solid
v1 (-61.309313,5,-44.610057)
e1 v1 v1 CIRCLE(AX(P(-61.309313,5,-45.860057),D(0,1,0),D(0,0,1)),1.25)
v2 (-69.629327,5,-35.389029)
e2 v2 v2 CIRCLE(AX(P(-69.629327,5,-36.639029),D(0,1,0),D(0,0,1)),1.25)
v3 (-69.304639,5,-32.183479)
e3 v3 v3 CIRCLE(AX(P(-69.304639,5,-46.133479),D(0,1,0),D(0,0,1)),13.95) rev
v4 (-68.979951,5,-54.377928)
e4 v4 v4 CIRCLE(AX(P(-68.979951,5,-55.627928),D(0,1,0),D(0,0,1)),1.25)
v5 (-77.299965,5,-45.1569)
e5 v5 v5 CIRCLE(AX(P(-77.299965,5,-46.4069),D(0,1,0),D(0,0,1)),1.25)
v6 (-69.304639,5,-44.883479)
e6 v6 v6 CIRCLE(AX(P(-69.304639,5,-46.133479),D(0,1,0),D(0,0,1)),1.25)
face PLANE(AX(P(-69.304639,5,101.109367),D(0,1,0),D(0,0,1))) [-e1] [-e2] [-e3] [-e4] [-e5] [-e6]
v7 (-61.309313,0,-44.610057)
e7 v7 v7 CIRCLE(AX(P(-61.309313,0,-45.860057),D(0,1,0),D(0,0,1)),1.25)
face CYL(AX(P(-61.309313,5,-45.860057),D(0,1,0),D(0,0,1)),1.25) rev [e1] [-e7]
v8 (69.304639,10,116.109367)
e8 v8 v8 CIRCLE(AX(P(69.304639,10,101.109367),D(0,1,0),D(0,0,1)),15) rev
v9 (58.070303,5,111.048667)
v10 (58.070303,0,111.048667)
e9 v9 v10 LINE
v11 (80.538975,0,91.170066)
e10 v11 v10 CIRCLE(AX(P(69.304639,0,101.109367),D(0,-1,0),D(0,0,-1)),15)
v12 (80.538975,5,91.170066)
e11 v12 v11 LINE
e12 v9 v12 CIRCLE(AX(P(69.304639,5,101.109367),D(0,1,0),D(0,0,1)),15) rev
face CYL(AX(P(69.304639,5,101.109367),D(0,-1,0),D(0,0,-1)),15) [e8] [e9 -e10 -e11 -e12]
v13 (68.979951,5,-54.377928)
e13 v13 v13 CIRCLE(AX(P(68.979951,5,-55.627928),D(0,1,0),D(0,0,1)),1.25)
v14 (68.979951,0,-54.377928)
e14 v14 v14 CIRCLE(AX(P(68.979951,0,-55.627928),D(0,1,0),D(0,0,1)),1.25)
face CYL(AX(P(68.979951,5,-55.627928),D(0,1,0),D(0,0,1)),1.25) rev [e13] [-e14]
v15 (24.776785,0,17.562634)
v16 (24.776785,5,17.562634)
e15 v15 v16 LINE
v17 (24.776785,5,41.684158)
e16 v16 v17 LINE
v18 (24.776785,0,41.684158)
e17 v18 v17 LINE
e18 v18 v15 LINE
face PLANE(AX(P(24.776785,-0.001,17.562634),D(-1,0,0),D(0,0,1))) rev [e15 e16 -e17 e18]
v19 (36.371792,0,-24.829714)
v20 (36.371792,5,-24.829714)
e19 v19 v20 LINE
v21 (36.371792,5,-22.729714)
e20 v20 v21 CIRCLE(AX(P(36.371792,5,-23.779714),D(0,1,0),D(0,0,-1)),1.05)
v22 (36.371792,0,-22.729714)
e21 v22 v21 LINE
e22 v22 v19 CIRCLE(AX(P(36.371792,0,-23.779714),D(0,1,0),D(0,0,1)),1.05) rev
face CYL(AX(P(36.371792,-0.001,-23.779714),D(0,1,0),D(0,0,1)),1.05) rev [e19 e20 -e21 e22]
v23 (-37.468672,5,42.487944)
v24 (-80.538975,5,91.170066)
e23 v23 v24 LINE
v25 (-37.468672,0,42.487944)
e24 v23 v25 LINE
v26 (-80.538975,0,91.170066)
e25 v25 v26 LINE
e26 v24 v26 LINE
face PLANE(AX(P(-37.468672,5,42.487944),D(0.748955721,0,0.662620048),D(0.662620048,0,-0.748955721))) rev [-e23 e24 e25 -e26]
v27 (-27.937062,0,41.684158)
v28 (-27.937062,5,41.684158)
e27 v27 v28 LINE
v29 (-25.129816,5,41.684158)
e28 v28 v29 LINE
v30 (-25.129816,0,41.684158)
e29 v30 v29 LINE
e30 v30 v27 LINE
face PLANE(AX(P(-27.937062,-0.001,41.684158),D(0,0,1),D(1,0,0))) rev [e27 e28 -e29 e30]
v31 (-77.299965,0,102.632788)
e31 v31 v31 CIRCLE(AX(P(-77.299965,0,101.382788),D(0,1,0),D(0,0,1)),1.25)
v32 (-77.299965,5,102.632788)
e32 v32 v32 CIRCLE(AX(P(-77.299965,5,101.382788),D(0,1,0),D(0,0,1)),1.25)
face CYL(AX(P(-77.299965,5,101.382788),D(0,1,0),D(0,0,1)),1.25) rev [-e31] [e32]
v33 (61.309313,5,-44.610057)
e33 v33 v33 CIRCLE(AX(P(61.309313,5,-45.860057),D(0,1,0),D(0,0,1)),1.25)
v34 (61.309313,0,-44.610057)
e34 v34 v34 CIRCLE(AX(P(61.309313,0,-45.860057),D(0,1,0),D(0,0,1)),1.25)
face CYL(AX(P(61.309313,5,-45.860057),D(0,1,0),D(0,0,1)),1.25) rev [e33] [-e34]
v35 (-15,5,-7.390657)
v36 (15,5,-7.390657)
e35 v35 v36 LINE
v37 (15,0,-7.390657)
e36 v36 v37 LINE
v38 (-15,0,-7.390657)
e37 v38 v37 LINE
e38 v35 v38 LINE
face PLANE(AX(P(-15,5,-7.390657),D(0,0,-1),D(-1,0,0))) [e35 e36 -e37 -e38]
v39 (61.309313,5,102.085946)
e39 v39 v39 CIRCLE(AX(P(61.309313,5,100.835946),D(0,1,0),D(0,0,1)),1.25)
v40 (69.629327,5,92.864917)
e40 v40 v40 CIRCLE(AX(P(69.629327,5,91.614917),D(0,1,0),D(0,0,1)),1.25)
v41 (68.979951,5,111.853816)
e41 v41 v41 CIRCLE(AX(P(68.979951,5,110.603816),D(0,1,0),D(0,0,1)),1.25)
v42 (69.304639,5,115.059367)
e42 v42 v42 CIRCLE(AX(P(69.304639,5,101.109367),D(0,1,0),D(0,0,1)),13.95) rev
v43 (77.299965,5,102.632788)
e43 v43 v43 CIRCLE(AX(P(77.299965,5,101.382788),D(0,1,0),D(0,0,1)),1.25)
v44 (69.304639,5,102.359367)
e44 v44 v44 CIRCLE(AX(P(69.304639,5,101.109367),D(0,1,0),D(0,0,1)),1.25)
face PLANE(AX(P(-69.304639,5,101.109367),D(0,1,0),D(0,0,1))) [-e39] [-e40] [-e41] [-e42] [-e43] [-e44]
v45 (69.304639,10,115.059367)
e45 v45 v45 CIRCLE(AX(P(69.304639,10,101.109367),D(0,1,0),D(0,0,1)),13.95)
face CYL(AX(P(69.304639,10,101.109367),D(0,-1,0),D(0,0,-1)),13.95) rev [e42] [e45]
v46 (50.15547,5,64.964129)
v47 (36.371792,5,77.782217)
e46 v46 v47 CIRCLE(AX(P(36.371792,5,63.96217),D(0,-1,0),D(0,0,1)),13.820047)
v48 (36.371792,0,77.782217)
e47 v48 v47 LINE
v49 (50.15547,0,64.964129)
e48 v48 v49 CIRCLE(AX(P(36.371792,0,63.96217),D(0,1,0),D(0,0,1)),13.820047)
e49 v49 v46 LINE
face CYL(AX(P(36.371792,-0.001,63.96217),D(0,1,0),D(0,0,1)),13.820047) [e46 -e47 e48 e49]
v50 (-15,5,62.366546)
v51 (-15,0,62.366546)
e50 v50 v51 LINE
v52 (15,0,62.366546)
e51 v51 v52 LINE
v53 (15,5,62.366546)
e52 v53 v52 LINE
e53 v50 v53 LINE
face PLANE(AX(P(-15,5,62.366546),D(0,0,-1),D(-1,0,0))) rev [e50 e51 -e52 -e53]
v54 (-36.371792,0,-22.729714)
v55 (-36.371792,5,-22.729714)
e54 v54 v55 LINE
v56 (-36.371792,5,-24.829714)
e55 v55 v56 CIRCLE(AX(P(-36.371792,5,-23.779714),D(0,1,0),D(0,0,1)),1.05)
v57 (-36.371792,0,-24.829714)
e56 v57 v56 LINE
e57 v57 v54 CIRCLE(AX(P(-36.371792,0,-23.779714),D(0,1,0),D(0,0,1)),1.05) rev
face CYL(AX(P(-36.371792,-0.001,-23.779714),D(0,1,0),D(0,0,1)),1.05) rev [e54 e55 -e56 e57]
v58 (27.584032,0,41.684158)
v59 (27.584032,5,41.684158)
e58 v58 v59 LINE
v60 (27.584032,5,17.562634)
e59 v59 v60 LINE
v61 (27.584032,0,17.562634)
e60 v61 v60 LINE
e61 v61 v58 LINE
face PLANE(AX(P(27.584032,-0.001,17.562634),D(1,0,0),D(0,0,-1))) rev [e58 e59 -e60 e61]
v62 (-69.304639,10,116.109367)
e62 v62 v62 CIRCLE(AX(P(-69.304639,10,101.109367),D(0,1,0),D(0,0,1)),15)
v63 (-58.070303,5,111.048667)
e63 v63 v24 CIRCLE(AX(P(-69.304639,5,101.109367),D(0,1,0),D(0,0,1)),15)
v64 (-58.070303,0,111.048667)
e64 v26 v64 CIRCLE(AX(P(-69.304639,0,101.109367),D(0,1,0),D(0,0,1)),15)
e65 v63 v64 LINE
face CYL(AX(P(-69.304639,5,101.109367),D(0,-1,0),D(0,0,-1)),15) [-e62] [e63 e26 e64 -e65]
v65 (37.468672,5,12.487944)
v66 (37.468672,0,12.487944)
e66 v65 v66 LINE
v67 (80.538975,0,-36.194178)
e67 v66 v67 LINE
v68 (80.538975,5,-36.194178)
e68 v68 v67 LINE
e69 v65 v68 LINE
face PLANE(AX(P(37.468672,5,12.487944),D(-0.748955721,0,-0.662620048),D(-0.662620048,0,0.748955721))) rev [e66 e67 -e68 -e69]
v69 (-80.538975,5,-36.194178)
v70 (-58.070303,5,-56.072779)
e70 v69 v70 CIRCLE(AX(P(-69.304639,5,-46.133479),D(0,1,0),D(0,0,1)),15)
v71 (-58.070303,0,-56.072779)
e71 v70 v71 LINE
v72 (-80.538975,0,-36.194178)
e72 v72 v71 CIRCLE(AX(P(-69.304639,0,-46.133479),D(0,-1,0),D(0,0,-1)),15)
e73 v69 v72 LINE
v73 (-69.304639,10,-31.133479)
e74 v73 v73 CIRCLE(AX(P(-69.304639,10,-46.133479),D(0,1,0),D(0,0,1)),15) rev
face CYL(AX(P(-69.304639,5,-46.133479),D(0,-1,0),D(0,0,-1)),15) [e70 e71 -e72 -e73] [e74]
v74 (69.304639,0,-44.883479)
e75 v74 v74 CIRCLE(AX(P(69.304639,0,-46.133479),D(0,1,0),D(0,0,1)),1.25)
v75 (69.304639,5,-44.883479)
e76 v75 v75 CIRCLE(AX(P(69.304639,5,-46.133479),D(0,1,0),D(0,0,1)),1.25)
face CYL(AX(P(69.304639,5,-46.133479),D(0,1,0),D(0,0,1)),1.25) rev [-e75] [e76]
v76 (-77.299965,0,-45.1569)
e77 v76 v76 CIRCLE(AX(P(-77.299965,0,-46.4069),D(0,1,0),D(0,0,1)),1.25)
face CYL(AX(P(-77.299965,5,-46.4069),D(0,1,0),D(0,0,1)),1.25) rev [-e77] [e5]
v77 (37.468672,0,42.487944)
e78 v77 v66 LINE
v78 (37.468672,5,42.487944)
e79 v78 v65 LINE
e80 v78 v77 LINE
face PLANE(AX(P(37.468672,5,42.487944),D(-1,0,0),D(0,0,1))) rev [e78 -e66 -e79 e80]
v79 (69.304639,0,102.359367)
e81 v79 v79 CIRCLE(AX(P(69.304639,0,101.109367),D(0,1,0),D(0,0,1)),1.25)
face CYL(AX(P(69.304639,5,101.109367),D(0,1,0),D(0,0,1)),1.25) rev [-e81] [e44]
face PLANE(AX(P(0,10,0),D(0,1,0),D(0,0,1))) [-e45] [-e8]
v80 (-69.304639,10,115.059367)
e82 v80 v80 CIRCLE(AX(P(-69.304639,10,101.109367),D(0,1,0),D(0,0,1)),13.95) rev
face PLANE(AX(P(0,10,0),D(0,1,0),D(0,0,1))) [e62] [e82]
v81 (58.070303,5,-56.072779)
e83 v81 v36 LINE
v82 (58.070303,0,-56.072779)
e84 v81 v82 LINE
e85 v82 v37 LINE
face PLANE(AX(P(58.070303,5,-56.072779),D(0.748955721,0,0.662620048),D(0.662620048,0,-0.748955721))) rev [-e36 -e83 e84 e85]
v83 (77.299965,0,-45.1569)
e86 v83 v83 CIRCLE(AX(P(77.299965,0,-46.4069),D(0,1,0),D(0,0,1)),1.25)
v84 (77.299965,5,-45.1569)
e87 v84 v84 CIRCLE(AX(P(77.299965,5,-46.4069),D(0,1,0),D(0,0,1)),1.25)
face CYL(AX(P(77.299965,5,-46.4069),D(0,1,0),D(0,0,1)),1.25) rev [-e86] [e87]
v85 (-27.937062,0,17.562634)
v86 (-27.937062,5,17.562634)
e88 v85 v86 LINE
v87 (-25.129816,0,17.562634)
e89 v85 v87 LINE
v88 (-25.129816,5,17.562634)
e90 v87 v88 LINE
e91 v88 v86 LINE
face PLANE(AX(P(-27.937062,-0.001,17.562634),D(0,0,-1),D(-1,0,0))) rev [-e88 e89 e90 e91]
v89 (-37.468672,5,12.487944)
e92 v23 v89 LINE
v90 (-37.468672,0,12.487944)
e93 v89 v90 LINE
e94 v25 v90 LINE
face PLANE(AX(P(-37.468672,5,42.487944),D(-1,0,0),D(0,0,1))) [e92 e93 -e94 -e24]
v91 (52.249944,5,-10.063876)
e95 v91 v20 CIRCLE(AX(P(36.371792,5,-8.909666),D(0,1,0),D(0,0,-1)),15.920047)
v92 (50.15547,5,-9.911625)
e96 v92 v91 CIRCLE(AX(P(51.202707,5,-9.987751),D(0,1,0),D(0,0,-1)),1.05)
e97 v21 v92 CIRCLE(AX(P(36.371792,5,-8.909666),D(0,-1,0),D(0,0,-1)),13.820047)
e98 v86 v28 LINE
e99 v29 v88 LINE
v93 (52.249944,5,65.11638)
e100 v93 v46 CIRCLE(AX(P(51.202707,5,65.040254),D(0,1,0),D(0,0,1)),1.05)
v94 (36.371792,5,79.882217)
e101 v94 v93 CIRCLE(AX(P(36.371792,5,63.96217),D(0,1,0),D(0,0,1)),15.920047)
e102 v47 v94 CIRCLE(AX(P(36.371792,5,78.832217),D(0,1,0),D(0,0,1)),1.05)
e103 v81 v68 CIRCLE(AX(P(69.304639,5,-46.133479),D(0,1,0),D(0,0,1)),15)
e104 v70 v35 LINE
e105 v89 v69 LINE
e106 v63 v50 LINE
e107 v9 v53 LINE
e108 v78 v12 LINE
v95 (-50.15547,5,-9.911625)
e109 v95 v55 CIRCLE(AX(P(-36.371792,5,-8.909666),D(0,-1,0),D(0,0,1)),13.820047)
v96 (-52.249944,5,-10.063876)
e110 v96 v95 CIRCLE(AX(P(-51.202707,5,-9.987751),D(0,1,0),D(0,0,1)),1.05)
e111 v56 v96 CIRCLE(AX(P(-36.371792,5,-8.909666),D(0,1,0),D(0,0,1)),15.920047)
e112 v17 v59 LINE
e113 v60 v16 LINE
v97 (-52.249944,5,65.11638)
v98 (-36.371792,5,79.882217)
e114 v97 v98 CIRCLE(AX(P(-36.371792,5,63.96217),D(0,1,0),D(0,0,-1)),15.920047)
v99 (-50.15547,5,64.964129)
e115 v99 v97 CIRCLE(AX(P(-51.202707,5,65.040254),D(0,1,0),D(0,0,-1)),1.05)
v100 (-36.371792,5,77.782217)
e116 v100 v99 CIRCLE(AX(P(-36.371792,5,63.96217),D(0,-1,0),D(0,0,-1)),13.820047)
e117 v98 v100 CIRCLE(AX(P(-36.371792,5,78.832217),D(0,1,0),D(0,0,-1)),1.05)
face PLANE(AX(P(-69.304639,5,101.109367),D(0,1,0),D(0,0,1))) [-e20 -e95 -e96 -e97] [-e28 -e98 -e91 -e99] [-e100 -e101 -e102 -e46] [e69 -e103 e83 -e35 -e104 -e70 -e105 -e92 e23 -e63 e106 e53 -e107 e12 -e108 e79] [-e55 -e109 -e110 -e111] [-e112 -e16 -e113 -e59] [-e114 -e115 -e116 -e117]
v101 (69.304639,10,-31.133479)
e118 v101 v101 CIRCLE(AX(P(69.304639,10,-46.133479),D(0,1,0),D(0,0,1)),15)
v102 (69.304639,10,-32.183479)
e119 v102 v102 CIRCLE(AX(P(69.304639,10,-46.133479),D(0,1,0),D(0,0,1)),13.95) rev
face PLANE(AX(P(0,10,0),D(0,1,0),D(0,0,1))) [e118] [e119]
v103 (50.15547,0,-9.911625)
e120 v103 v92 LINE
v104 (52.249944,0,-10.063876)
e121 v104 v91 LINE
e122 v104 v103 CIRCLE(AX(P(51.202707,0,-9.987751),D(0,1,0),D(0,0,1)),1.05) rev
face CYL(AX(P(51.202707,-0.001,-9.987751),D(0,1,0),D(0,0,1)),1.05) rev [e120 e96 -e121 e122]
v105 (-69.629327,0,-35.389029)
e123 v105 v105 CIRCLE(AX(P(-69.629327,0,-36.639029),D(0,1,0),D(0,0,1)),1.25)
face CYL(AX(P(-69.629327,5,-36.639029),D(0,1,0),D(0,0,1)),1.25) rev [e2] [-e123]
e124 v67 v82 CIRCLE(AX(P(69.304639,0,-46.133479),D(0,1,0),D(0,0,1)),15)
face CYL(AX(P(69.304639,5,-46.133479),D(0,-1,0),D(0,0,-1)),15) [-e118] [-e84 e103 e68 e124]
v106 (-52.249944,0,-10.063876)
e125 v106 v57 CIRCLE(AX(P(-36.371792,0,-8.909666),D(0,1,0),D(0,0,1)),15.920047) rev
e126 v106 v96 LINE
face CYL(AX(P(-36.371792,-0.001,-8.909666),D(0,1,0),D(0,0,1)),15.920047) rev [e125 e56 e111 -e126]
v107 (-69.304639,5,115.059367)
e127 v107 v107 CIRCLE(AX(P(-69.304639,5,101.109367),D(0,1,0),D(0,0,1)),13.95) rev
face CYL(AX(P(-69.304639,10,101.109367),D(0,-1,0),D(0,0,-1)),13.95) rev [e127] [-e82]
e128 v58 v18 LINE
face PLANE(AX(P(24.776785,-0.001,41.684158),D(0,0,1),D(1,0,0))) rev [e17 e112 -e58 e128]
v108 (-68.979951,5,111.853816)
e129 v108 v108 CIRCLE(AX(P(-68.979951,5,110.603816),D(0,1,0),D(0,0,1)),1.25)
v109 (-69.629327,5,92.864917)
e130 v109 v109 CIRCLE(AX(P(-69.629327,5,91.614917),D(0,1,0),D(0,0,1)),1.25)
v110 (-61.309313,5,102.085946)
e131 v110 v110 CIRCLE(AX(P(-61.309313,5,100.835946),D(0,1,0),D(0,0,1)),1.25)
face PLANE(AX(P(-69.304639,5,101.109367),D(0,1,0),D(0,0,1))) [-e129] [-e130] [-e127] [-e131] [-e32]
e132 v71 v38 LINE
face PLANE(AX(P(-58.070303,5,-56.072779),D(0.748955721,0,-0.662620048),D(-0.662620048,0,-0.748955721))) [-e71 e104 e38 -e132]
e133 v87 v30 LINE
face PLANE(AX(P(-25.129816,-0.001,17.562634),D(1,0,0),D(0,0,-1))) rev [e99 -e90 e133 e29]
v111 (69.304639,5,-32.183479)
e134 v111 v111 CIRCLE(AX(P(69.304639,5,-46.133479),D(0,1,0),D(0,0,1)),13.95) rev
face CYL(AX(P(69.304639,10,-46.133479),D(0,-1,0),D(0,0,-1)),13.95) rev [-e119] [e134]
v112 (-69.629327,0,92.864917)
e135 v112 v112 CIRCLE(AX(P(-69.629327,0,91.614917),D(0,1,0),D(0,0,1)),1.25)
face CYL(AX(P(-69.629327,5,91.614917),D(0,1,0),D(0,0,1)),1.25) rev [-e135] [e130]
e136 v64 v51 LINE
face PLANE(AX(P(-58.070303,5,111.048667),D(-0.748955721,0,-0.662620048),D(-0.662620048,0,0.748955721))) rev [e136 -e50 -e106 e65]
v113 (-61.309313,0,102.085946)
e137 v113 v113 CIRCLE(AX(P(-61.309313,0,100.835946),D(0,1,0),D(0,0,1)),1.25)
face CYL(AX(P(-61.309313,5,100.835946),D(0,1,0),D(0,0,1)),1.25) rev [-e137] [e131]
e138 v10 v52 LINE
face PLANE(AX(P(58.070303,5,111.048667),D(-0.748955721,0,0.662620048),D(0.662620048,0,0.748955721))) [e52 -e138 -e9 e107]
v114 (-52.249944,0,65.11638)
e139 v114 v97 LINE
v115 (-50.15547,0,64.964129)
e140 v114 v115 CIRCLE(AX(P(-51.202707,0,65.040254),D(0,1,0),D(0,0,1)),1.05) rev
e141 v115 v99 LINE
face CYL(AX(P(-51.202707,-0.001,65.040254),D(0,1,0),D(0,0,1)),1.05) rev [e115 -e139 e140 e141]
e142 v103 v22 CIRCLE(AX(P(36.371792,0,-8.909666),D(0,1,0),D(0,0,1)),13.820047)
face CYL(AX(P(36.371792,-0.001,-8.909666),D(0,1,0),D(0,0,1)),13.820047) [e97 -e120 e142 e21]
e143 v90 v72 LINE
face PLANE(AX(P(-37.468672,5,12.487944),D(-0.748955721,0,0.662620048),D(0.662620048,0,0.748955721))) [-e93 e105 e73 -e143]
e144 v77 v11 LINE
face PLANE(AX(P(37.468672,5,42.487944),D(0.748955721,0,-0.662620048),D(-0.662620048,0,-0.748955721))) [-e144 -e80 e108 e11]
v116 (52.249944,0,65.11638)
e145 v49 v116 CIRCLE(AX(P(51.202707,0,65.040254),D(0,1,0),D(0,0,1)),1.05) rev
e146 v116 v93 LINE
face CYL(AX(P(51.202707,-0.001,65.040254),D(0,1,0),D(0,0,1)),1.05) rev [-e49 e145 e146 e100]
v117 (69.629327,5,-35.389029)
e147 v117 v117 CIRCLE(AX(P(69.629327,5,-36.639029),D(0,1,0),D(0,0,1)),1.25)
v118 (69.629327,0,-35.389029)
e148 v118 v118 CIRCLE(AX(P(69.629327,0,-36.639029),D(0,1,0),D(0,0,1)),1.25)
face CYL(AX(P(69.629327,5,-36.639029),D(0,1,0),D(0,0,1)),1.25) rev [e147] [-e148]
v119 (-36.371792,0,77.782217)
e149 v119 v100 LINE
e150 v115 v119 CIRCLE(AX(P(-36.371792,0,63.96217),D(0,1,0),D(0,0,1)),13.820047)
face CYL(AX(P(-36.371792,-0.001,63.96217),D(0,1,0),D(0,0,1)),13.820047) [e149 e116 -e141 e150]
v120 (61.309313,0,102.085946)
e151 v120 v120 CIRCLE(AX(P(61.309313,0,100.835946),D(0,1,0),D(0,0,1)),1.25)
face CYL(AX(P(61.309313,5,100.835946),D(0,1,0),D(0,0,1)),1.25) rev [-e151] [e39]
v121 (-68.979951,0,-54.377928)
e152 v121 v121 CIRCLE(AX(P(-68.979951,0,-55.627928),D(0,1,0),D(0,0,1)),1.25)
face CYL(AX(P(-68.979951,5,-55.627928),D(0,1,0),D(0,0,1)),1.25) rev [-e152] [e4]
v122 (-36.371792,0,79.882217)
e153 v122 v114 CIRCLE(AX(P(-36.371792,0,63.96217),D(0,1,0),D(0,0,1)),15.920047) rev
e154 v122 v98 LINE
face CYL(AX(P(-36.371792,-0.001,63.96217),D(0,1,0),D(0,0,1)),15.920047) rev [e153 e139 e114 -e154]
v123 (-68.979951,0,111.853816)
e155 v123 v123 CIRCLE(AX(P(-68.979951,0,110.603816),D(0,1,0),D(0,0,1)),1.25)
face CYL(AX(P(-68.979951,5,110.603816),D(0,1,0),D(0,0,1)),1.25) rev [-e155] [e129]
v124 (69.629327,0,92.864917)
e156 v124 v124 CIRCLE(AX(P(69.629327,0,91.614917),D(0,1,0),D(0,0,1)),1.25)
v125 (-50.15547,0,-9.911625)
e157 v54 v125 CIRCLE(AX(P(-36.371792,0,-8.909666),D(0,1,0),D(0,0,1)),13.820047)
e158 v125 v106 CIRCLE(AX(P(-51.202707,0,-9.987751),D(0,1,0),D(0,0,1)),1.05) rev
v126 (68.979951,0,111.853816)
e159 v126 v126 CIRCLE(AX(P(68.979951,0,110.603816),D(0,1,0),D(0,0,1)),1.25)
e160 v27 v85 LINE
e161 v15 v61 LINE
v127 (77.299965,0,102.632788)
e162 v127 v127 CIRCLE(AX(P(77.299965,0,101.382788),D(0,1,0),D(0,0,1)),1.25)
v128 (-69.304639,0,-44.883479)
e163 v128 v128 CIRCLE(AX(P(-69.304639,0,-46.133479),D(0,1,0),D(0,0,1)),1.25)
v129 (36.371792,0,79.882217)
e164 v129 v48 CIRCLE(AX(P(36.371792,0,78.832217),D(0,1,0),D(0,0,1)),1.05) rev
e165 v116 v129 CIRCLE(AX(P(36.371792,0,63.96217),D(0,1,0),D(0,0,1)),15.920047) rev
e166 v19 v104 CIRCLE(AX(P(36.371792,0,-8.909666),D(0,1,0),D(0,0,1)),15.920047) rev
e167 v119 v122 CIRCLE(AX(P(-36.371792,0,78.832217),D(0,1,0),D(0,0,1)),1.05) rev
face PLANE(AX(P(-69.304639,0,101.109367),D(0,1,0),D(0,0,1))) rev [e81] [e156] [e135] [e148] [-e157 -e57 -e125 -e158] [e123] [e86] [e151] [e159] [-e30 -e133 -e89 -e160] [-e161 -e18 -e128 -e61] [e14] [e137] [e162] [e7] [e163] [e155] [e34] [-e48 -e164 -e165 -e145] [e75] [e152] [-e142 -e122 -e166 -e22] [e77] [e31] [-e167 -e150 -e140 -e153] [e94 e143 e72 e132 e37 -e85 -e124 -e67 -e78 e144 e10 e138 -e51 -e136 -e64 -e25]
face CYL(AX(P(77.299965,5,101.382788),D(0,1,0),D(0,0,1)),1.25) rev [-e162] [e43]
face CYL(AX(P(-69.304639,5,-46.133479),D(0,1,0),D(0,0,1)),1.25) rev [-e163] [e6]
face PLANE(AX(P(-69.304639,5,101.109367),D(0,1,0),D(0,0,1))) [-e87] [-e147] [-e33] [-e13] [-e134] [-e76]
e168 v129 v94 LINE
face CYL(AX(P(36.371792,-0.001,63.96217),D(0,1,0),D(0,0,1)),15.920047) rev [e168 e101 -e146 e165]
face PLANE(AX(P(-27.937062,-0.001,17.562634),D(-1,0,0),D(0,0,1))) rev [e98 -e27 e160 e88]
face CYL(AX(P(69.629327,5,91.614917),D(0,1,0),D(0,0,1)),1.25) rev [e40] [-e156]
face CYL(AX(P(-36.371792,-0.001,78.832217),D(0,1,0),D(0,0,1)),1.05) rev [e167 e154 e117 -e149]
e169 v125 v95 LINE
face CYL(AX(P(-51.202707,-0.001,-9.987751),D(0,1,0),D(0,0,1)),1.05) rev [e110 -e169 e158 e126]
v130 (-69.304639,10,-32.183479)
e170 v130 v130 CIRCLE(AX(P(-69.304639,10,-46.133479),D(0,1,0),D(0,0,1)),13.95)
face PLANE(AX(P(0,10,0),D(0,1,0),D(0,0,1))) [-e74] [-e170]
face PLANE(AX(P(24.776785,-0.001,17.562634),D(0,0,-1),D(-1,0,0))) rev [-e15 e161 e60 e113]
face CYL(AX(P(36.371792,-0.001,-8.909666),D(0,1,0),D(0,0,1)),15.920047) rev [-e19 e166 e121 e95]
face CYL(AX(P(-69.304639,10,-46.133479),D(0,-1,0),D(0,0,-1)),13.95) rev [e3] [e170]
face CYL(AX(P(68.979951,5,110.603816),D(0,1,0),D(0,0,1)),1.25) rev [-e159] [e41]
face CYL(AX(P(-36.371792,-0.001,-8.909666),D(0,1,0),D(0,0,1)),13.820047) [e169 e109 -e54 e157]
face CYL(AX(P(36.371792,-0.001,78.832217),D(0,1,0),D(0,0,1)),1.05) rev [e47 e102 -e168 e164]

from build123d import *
from build123d.topology import SkipClean

# Parameters (mm, degrees)
BOSS_EXTRUDE1_DEPTH    = 5
M3_TAPPED_HOLE1_D      = 2.5
SKETCH2_R              = 13.95
BOSS_EXTRUDE4_DEPTH    = 5
CUT_EXTRUDE1_START     = -5
CUT_EXTRUDE1_OUTLINE_W = 2.807246308
CUT_EXTRUDE1_OUTLINE_H = 24.121523831
CUT_EXTRUDE1_DEPTH     = 5


# Read off the part's stored shape, not the designer's step: Cut-Extrude1
with BuildPart() as part:
    # Sketch1 → Boss-Extrude1 (new body)
    with BuildSketch(Plane(origin=(0, 0, 0), x_dir=(1, 0, 0), z_dir=(0, 1, 0))):
        with BuildLine():
            Line((-15, 7.390657387), (15, 7.390657387))
            Line((15, 7.390657387), (58.070303134, 56.072779239))
            ThreePointArc((58.070303134, 56.072779239), (79.243939669, 57.367814327), (80.538974758, 36.194177792))
            Line((80.538974758, 36.194177792), (37.468671624, -12.487944059))
            Line((37.468671624, -12.487944059), (37.468671624, -42.487944059))
            Line((37.468671624, -42.487944059), (80.538974758, -91.17006591))
            ThreePointArc((80.538974758, -91.17006591), (79.243939669, -112.343702445), (58.070303134, -111.048667357))
            Line((58.070303134, -111.048667357), (15, -62.366545506))
            Line((15, -62.366545506), (-15, -62.366545506))
            Line((-15, -62.366545506), (-58.070303134, -111.048667357))
            ThreePointArc((-58.070303134, -111.048667357), (-79.243939669, -112.343702445), (-80.538974758, -91.17006591))
            Line((-80.538974758, -91.17006591), (-37.468671624, -42.487944059))
            Line((-37.468671624, -42.487944059), (-37.468671624, -12.487944059))
            Line((-37.468671624, -12.487944059), (-80.538974758, 36.194177792))
            ThreePointArc((-80.538974758, 36.194177792), (-79.243939669, 57.367814327), (-58.070303134, 56.072779239))
            Line((-58.070303134, 56.072779239), (-15, 7.390657387))
        make_face()
    extrude(amount=BOSS_EXTRUDE1_DEPTH)

    # M3 Tapped Hole1 (through all)
    with Locations(Plane(origin=(-77.299965137, 5, -46.406899623), x_dir=(0, 0, 1), z_dir=(0, 1, 0))):
        with Locations((0, 0), (0.273421108, 7.995326191), (-9.221028744, 8.320013756), (0.546842215, 15.990652382), (9.767870959, 7.670638626), (138.021816405, 7.670638626), (147.789687364, 0), (157.010716108, 8.320013756), (147.242845149, 15.990652382), (138.021816405, 146.929291648), (147.242845149, 138.609277892), (147.516266257, 146.604604083), (157.010716108, 146.279916518), (147.789687364, 154.599930274), (0.546842215, 138.609277892), (0.273421108, 146.604604083), (-9.221028744, 146.279916518), (9.767870959, 146.929291648), (0, 154.599930274)):
            Hole(M3_TAPPED_HOLE1_D / 2)

    # Sketch2 → Boss-Extrude4 (add)
    # profile 1 of 4: a face of its own
    with BuildSketch(Plane(origin=(0, 5, 0), x_dir=(1, 0, 0), z_dir=(0, 1, 0))):
        with BuildLine():
            ThreePointArc((-58.070303134, 56.072779239), (-59.365338223, 34.899142704), (-80.538974758, 36.194177792))
            ThreePointArc((-80.538974758, 36.194177792), (-79.243939669, 57.367814327), (-58.070303134, 56.072779239))
        make_face()
        with Locations(Location((-69.304638946, 46.133478515, 0), (0, 0, 270))):
            Circle(SKETCH2_R, mode=Mode.SUBTRACT)
    # profile 2 of 4: a face of its own
    with BuildSketch(Plane(origin=(0, 5, 0), x_dir=(1, 0, 0), z_dir=(0, 1, 0))):
        with BuildLine():
            ThreePointArc((-58.070303134, -111.048667357), (-59.365338223, -89.875030822), (-80.538974758, -91.17006591))
            ThreePointArc((-80.538974758, -91.17006591), (-79.243939669, -112.343702445), (-58.070303134, -111.048667357))
        make_face()
        with Locations(Location((-69.304638946, -101.109366634, 0), (0, 0, 270))):
            Circle(SKETCH2_R, mode=Mode.SUBTRACT)
    # profile 3 of 4: a face of its own
    with BuildSketch(Plane(origin=(0, 5, 0), x_dir=(1, 0, 0), z_dir=(0, 1, 0))):
        with BuildLine():
            ThreePointArc((58.070303134, -111.048667357), (59.365338223, -89.875030822), (80.538974758, -91.17006591))
            ThreePointArc((80.538974758, -91.17006591), (79.243939669, -112.343702445), (58.070303134, -111.048667357))
        make_face()
        with Locations(Location((69.304638946, -101.109366634, 0), (0, 0, 270))):
            Circle(SKETCH2_R, mode=Mode.SUBTRACT)
    # profile 4 of 4: a face of its own
    with BuildSketch(Plane(origin=(0, 5, 0), x_dir=(1, 0, 0), z_dir=(0, 1, 0))):
        with BuildLine():
            ThreePointArc((58.070303134, 56.072779239), (59.365338223, 34.899142704), (80.538974758, 36.194177792))
            ThreePointArc((80.538974758, 36.194177792), (79.243939669, 57.367814327), (58.070303134, 56.072779239))
        make_face()
        with Locations(Location((69.304638946, 46.133478515, 0), (0, 0, 270))):
            Circle(SKETCH2_R, mode=Mode.SUBTRACT)
    extrude(amount=BOSS_EXTRUDE4_DEPTH)

    # Cut-Extrude1 outline → Cut-Extrude1 (cut)
    with SkipClean():  # the faces are left unmerged after this step: merging them gives an invalid solid
        with BuildSketch(Plane(origin=(0, 5, 0), x_dir=(1, 0, 0), z_dir=(0, 1, 0)).offset(CUT_EXTRUDE1_START)):
            with BuildLine():
                ThreePointArc((-50.155470131, 9.911625133), (-45.783130536, 19.029963413), (-36.371791915, 22.729713658))
                ThreePointArc((-36.371791915, 22.729713658), (-35.321791915, 23.779713658), (-36.371791915, 24.829713658))
                ThreePointArc((-36.371791915, 24.829713658), (-47.213213279, 20.567774633), (-52.249943738, 10.063875941))
                ThreePointArc((-52.249943738, 10.063875941), (-51.278832338, 8.940513734), (-50.155470131, 9.911625133))
            make_face()
            with Locations((26.180408459, -29.623395638)):
                Rectangle(CUT_EXTRUDE1_OUTLINE_W, CUT_EXTRUDE1_OUTLINE_H)
            with Locations((-26.533438878, -29.623395638)):
                Rectangle(CUT_EXTRUDE1_OUTLINE_W, CUT_EXTRUDE1_OUTLINE_H)
            with BuildLine():
                ThreePointArc((52.249943738, 10.063875941), (47.213213279, 20.567774633), (36.371791915, 24.829713658))
                ThreePointArc((36.371791915, 24.829713658), (35.321791915, 23.779713658), (36.371791915, 22.729713658))
                ThreePointArc((36.371791915, 22.729713658), (45.783130536, 19.029963413), (50.155470131, 9.911625133))
                ThreePointArc((50.155470131, 9.911625133), (51.278832338, 8.940513734), (52.249943738, 10.063875941))
            make_face()
            with BuildLine():
                ThreePointArc((50.155470131, -64.964128793), (45.783130536, -74.082467073), (36.371791915, -77.782217317))
                ThreePointArc((36.371791915, -77.782217317), (35.321791915, -78.832217317), (36.371791915, -79.882217317))
                ThreePointArc((36.371791915, -79.882217317), (47.213213279, -75.620278293), (52.249943738, -65.116379601))
                ThreePointArc((52.249943738, -65.116379601), (51.278832338, -63.993017394), (50.155470131, -64.964128793))
            make_face()
            with BuildLine():
                ThreePointArc((-52.249943738, -65.116379601), (-47.213213279, -75.620278293), (-36.371791915, -79.882217317))
                ThreePointArc((-36.371791915, -79.882217317), (-35.321791915, -78.832217317), (-36.371791915, -77.782217317))
                ThreePointArc((-36.371791915, -77.782217317), (-45.783130536, -74.082467073), (-50.155470131, -64.964128793))
                ThreePointArc((-50.155470131, -64.964128793), (-51.278832338, -63.993017394), (-52.249943738, -65.116379601))
            make_face()
        extrude(amount=CUT_EXTRUDE1_DEPTH, mode=Mode.SUBTRACT)


solid = part.part
